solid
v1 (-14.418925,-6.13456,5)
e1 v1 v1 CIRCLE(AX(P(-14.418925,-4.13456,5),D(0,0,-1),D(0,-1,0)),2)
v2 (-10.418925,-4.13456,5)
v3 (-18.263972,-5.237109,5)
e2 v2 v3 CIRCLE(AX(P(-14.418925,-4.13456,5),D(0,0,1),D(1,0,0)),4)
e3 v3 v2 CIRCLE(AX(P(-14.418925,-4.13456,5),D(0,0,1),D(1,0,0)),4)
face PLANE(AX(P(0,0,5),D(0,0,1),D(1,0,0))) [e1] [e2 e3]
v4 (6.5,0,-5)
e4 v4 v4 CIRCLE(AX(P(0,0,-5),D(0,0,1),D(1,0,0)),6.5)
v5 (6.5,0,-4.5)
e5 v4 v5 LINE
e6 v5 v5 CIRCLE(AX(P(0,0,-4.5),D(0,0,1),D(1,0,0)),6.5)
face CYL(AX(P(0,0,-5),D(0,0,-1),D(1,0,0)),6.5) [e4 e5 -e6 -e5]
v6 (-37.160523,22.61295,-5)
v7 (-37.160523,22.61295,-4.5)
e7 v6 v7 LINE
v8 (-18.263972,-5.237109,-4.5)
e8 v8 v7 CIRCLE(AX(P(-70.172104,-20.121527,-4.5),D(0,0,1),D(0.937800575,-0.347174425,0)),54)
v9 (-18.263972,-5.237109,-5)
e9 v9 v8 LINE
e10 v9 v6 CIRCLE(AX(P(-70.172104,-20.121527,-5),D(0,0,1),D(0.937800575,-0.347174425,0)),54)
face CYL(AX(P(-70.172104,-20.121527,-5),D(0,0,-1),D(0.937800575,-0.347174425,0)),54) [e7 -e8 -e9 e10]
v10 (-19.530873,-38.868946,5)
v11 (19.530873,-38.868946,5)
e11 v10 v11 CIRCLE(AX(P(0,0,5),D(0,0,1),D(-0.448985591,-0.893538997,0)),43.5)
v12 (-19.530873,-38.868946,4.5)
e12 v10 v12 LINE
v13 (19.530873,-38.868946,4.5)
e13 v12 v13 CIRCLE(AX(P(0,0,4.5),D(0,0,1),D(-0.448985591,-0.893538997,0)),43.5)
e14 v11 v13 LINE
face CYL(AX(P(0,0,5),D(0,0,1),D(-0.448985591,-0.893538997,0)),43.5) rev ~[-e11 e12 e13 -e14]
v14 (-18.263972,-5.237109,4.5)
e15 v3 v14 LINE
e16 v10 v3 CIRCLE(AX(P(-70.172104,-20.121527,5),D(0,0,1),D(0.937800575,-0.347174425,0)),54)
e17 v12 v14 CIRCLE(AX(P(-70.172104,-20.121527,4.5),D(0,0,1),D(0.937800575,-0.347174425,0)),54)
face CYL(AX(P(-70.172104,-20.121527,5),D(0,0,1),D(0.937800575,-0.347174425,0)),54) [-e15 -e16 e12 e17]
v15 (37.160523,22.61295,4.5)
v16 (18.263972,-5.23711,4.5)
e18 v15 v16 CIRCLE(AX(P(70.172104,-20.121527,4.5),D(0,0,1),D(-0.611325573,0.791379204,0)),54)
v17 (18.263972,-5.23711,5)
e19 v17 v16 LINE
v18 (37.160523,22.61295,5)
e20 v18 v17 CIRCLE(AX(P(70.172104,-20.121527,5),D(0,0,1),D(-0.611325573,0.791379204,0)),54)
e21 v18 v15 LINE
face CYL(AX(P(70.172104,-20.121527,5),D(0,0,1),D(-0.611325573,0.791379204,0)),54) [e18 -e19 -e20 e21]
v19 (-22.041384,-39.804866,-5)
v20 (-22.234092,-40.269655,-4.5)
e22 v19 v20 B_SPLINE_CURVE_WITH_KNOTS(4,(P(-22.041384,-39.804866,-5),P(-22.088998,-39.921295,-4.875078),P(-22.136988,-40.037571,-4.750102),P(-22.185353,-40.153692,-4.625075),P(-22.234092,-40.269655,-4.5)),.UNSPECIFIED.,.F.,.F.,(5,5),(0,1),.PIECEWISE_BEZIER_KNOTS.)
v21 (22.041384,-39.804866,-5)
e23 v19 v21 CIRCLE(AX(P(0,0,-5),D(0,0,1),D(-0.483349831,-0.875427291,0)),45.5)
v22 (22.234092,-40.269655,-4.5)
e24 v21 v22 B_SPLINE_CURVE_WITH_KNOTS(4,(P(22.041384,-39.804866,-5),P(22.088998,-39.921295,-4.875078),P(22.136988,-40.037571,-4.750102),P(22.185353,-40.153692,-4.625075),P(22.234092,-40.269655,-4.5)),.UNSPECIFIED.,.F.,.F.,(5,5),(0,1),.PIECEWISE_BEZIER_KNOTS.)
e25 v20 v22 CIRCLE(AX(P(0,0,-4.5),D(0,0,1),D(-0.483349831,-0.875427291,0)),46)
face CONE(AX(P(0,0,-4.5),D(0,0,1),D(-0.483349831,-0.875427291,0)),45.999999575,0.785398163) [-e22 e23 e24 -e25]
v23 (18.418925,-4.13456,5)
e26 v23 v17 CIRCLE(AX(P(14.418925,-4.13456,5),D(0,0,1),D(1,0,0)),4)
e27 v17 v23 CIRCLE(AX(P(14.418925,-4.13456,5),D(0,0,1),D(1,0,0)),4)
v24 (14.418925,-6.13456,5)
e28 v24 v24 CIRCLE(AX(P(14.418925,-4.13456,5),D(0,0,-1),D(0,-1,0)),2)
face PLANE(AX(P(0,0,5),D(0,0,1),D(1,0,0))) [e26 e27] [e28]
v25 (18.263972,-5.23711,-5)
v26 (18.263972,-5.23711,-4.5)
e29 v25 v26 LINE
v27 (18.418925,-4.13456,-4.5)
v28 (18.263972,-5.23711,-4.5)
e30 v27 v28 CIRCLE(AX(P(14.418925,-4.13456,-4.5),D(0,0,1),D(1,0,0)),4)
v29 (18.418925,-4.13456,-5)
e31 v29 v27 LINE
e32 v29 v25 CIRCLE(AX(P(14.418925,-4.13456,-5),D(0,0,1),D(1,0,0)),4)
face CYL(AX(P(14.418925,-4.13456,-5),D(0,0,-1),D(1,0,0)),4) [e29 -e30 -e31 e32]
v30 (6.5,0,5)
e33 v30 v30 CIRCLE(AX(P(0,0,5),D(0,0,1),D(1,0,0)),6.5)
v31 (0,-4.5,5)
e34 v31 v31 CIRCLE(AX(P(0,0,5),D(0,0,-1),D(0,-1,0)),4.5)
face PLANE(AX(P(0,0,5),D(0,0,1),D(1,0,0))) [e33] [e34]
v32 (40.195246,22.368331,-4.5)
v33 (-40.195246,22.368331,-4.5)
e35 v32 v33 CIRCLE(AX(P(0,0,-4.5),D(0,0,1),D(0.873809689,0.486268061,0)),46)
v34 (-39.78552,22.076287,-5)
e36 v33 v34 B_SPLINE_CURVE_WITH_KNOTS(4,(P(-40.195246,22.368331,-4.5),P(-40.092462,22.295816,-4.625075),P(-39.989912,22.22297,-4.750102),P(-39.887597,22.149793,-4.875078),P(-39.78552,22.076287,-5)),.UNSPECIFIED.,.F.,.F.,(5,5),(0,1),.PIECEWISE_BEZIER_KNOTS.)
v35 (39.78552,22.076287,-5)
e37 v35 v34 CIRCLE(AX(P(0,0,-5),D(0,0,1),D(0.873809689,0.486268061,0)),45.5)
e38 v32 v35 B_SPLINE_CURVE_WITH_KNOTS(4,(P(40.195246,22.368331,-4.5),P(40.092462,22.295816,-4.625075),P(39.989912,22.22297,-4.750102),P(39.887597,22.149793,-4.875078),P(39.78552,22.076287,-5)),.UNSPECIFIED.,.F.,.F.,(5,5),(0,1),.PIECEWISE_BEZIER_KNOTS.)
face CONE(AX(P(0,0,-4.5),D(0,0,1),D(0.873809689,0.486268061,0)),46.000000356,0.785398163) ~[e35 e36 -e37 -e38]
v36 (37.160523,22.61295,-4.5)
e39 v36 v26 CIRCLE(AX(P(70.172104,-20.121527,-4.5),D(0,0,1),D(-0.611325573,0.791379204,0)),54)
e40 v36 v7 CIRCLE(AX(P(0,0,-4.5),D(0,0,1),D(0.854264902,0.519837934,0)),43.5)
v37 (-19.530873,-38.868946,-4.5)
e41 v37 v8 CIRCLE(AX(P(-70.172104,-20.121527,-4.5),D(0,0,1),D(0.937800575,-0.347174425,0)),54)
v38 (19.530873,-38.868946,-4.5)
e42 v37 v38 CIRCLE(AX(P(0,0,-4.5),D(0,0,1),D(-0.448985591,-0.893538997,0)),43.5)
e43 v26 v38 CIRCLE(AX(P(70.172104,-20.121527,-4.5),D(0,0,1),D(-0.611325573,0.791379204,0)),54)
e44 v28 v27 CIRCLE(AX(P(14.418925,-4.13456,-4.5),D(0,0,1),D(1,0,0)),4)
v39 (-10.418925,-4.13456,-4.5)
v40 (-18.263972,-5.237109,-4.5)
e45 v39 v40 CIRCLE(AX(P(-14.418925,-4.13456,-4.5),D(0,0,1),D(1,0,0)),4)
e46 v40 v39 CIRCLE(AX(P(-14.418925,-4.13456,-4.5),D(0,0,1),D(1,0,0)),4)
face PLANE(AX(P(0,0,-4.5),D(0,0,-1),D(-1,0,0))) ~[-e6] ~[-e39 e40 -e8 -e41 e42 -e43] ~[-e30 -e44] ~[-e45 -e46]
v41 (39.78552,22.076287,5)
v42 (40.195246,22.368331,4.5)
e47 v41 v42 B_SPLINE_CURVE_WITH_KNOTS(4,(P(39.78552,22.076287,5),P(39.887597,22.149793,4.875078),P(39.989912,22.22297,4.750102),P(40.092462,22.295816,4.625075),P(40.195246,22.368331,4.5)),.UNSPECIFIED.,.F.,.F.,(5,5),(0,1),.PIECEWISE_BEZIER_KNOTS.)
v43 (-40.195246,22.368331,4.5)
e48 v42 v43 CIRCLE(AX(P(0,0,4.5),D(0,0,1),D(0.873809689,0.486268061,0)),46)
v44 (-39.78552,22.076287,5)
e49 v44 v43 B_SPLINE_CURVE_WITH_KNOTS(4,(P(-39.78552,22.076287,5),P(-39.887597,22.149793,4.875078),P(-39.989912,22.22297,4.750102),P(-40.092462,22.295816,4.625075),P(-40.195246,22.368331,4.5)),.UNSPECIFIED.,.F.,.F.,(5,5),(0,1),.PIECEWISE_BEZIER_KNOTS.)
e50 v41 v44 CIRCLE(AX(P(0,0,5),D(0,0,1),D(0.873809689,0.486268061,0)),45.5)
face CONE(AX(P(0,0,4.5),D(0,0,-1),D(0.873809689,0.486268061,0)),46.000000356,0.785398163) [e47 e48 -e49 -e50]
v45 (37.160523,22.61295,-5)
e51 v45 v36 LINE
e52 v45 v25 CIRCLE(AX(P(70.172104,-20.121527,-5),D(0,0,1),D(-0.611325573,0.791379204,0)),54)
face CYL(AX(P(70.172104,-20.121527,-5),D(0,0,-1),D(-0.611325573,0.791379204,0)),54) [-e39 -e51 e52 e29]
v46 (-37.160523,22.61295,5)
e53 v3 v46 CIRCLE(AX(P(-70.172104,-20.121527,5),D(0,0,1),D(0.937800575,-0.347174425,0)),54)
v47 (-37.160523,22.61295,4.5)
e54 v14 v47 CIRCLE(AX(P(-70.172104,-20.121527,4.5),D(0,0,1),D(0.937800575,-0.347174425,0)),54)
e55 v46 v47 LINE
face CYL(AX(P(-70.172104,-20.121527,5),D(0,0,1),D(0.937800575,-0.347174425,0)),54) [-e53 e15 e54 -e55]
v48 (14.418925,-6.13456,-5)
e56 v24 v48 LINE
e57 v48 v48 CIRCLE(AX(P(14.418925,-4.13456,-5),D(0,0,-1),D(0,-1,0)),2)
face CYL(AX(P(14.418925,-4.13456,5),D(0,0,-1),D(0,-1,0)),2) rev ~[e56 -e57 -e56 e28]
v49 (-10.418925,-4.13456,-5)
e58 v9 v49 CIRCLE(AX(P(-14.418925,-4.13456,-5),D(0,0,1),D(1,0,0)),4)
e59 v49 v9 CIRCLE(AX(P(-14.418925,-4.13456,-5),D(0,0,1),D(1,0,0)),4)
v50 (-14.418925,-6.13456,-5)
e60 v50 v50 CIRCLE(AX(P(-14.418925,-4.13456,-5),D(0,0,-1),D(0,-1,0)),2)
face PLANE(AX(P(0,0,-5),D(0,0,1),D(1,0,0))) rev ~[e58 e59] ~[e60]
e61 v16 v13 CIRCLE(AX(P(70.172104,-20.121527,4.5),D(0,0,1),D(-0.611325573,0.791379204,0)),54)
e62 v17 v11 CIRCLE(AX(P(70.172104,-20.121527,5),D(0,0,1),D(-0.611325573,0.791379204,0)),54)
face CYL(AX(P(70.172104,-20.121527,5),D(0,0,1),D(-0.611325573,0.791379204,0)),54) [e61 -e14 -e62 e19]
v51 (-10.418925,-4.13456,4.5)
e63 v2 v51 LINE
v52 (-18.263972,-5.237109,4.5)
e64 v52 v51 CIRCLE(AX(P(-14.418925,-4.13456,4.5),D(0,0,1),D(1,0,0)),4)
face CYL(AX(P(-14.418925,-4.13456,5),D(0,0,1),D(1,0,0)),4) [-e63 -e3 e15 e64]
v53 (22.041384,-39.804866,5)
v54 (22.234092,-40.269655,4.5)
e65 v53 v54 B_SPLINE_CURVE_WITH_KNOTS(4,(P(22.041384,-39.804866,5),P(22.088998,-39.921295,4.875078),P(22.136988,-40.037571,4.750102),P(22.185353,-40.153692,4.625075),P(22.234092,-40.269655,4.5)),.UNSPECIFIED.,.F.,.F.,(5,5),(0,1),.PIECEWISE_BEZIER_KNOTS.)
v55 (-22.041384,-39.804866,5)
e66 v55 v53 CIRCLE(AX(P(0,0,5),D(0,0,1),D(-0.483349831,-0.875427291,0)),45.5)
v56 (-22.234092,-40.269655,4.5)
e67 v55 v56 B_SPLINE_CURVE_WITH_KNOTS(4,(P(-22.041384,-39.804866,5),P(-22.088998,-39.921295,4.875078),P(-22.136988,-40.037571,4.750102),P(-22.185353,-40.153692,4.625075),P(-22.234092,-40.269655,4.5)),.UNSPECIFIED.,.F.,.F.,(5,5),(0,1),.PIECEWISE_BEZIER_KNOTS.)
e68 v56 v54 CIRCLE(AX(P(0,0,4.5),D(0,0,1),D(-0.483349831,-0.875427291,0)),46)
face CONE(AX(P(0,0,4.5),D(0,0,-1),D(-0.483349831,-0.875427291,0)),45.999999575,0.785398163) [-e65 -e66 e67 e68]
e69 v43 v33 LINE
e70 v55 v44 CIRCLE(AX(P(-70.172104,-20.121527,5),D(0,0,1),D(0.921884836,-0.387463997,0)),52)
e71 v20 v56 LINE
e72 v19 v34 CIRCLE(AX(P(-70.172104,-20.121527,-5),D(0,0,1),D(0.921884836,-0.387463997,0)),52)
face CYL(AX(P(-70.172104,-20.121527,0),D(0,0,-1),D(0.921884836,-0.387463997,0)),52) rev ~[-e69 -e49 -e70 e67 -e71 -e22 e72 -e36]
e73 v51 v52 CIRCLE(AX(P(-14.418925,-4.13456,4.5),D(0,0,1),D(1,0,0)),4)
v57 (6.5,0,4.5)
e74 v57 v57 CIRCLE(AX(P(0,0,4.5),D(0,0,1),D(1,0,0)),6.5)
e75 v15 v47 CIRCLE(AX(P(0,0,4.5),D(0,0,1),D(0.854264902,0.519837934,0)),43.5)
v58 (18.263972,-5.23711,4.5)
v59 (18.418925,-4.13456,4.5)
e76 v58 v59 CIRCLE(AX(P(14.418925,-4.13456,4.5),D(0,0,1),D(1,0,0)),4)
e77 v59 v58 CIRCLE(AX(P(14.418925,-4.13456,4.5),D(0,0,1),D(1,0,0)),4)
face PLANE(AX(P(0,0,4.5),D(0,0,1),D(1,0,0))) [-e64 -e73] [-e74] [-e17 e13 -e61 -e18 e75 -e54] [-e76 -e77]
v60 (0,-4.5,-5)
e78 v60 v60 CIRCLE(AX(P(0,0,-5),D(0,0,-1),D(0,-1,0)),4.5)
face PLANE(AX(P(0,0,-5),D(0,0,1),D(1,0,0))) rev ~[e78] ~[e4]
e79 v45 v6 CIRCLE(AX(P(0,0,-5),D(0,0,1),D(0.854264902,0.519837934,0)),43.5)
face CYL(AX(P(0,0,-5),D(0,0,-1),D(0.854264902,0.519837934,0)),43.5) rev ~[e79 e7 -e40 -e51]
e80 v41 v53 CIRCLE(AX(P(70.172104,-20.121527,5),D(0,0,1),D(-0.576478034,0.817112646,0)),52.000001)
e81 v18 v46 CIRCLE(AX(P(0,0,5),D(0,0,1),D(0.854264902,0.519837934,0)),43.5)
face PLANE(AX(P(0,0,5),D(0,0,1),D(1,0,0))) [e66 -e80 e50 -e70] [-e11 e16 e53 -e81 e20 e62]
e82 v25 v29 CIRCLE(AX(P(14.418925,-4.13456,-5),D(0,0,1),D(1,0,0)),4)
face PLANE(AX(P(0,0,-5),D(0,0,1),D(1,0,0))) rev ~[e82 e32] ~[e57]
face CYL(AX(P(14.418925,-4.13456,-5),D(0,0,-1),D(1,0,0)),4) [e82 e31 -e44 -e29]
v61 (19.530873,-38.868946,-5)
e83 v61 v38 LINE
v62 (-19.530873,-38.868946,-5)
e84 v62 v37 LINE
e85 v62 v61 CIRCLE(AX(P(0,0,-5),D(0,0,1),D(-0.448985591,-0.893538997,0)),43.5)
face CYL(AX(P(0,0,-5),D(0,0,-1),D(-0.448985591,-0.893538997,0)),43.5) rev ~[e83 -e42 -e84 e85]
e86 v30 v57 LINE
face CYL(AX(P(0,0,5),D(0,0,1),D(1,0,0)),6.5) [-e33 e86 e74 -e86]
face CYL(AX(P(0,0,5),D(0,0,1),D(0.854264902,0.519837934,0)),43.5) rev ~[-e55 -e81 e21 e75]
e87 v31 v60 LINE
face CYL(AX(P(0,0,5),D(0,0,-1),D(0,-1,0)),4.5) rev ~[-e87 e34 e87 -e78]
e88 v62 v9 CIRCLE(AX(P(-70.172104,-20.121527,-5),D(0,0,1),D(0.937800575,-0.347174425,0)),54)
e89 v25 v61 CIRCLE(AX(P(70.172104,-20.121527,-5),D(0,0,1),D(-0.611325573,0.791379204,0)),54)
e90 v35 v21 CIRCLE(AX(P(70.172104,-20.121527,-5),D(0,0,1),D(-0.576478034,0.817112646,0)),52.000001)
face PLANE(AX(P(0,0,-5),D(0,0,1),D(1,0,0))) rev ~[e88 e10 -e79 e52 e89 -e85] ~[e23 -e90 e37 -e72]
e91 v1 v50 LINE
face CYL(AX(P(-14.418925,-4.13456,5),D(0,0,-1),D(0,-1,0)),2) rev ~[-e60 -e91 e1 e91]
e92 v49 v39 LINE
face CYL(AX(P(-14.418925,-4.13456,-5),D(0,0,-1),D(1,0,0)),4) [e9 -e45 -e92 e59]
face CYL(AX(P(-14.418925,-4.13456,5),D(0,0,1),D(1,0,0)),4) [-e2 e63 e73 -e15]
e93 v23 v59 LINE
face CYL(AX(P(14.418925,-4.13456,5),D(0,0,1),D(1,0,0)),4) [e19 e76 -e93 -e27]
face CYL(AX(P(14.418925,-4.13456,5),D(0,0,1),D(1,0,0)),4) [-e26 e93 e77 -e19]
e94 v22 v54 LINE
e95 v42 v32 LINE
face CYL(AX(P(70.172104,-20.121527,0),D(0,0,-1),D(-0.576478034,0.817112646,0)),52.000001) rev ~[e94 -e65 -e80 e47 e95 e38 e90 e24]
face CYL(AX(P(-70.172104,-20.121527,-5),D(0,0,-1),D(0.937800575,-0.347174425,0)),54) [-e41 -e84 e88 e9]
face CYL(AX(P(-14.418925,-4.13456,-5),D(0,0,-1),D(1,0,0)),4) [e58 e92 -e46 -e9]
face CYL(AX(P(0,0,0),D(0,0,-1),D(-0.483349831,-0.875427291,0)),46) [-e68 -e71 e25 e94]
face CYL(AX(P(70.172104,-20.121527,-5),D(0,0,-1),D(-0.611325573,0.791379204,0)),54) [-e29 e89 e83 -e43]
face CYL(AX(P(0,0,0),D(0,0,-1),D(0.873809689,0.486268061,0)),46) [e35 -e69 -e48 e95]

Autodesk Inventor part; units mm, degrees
ref_plane "YZ Plane" through (0, 0, 0) normal (1, 0, 0) x (0, 1, 0)
ref_plane "XZ Plane" through (0, 0, 0) normal (0, 1, 0) x (-1, 0, 0)
ref_plane "XY Plane" through (0, 0, 0) normal (0, 0, 1) x (1, 0, 0)
sketch "Sketch1" plane through (0, 0, 0) normal (0, 0, 1) x (1, 0, 0)
  arc A0 (-44.218038, -12.679318) -> (-22.234092, -40.269655) centre (0, 0) ccw construction
  arc A1 (-22.234092, -40.269655) -> (-40.195246, 22.368331) centre (-70.172104, -20.121527) ccw
  line L0 (0, 0) -> (-70.172104, -20.121527) construction
  line L1 (0, -64.4) -> (0, 64.4) construction
  arc A2 (40.195246, 22.368331) -> (22.234092, -40.269655) centre (70.172104, -20.121527) ccw
  line L2 (0, 0) -> (70.172104, -20.121527) construction
  arc A3 (-40.195246, 22.368331) -> (-44.218038, 12.679318) centre (0, 0) ccw construction
  arc A4 (-22.234092, -40.269655) -> (22.234092, -40.269655) centre (0, 0) ccw
  arc A5 (22.234092, -40.269655) -> (40.195246, 22.368331) centre (0, 0) ccw construction
  arc A6 (40.195246, 22.368331) -> (-40.195246, 22.368331) centre (0, 0) ccw
  arc A7 (-44.218038, 12.679318) -> (-44.218038, -12.679318) centre (0, 0) ccw construction
  dimension "d0" = 92
  dimension "d1" = 52
  dimension "d2" = 73
  dimension "d3" = 148
extrude "Extrusion1" add sketch "Sketch1" along normal mid plane 10
sketch "Sketch2" plane through (0, 0, 5) normal (0, 0, 1) x (1, 0, 0)
  arc A0 (-22.234092, -40.269655) -> (-40.195246, 22.368331) centre (-70.172104, -20.121527) ccw
  arc A1 (-22.234092, -40.269655) -> (22.234092, -40.269655) centre (0, 0) ccw
  arc A2 (40.195246, 22.368331) -> (22.234092, -40.269655) centre (70.172104, -20.121527) ccw
  arc A3 (40.195246, 22.368331) -> (-40.195246, 22.368331) centre (0, 0) ccw
  line L0 (0, 0) -> (-70.172104, -20.121527) construction
  line L1 (0, 0) -> (70.172104, -20.121527) construction
  point P0 (-14.418925, -4.13456)
  point P1 (14.418925, -4.13456)
  dimension "d6" = 15
  dimension "d7" = 15
hole "Hole1" at (-14.418925, -4.13456, 5) at (14.418925, -4.13456, 5) direction (0, 0, -1) diameter 4 end through all
sketch "Sketch3" plane through (0, 0, 5) normal (0, 0, 1) x (1, 0, 0)
  arc A0 (-22.234092, -40.269655) -> (22.234092, -40.269655) centre (0, 0) ccw
hole "Hole2" at (0, 0, 5) direction (0, 0, -1) diameter 9 end through all
chamfer "Chamfer1" distance 0.5 angle 45 4 edges at (0, 46, 5) (0, 46, -5) (0, -46, -5) (0, -46, 5)
sketch "Sketch4" plane through (0, 0, 5) normal (0, 0, 1) x (1, 0, 0)
  arc A0 (-22.041384, -39.804866) -> (22.041384, -39.804866) centre (0, 0) ccw
  arc A1 (39.785519, 22.076287) -> (22.041384, -39.804866) centre (70.172104, -20.121527) ccw
  arc A2 (39.785519, 22.076287) -> (-39.785519, 22.076287) centre (0, 0) ccw
  arc A3 (-22.041384, -39.804866) -> (-39.785519, 22.076287) centre (-70.172104, -20.121527) ccw
  circle A4 centre (0, 0) radius 4.5
  circle A5 centre (-14.418925, -4.13456) radius 2
  circle A6 centre (14.418925, -4.13456) radius 2
  arc A7 (37.160523, 22.61295) -> (-37.160523, 22.61295) centre (0, 0) ccw
  arc A8 (37.160523, 22.61295) -> (19.530873, -38.868946) centre (70.172104, -20.121527) ccw
  arc A9 (-19.530873, -38.868946) -> (19.530873, -38.868946) centre (0, 0) ccw
  arc A10 (-19.530873, -38.868946) -> (-37.160523, 22.61295) centre (-70.172104, -20.121527) ccw
  circle A11 centre (-14.418925, -4.13456) radius 4
  circle A12 centre (0, 0) radius 6.5
  circle A13 centre (14.418925, -4.13456) radius 4
  dimension "d25" = 2
  dimension "d26" = 2
  dimension "d27" = 2
  dimension "d28" = 2
extrude "Extrusion2" cut sketch "Sketch4" against normal blind 0.5 contours A8 A9 A10 A7
mirror "Mirror1" about plane through (0, 0, 0) normal (0, 0, 1) of "Extrusion2"
equation "\"d7\" = d6"
properties part number "Disk" material "Steel"
